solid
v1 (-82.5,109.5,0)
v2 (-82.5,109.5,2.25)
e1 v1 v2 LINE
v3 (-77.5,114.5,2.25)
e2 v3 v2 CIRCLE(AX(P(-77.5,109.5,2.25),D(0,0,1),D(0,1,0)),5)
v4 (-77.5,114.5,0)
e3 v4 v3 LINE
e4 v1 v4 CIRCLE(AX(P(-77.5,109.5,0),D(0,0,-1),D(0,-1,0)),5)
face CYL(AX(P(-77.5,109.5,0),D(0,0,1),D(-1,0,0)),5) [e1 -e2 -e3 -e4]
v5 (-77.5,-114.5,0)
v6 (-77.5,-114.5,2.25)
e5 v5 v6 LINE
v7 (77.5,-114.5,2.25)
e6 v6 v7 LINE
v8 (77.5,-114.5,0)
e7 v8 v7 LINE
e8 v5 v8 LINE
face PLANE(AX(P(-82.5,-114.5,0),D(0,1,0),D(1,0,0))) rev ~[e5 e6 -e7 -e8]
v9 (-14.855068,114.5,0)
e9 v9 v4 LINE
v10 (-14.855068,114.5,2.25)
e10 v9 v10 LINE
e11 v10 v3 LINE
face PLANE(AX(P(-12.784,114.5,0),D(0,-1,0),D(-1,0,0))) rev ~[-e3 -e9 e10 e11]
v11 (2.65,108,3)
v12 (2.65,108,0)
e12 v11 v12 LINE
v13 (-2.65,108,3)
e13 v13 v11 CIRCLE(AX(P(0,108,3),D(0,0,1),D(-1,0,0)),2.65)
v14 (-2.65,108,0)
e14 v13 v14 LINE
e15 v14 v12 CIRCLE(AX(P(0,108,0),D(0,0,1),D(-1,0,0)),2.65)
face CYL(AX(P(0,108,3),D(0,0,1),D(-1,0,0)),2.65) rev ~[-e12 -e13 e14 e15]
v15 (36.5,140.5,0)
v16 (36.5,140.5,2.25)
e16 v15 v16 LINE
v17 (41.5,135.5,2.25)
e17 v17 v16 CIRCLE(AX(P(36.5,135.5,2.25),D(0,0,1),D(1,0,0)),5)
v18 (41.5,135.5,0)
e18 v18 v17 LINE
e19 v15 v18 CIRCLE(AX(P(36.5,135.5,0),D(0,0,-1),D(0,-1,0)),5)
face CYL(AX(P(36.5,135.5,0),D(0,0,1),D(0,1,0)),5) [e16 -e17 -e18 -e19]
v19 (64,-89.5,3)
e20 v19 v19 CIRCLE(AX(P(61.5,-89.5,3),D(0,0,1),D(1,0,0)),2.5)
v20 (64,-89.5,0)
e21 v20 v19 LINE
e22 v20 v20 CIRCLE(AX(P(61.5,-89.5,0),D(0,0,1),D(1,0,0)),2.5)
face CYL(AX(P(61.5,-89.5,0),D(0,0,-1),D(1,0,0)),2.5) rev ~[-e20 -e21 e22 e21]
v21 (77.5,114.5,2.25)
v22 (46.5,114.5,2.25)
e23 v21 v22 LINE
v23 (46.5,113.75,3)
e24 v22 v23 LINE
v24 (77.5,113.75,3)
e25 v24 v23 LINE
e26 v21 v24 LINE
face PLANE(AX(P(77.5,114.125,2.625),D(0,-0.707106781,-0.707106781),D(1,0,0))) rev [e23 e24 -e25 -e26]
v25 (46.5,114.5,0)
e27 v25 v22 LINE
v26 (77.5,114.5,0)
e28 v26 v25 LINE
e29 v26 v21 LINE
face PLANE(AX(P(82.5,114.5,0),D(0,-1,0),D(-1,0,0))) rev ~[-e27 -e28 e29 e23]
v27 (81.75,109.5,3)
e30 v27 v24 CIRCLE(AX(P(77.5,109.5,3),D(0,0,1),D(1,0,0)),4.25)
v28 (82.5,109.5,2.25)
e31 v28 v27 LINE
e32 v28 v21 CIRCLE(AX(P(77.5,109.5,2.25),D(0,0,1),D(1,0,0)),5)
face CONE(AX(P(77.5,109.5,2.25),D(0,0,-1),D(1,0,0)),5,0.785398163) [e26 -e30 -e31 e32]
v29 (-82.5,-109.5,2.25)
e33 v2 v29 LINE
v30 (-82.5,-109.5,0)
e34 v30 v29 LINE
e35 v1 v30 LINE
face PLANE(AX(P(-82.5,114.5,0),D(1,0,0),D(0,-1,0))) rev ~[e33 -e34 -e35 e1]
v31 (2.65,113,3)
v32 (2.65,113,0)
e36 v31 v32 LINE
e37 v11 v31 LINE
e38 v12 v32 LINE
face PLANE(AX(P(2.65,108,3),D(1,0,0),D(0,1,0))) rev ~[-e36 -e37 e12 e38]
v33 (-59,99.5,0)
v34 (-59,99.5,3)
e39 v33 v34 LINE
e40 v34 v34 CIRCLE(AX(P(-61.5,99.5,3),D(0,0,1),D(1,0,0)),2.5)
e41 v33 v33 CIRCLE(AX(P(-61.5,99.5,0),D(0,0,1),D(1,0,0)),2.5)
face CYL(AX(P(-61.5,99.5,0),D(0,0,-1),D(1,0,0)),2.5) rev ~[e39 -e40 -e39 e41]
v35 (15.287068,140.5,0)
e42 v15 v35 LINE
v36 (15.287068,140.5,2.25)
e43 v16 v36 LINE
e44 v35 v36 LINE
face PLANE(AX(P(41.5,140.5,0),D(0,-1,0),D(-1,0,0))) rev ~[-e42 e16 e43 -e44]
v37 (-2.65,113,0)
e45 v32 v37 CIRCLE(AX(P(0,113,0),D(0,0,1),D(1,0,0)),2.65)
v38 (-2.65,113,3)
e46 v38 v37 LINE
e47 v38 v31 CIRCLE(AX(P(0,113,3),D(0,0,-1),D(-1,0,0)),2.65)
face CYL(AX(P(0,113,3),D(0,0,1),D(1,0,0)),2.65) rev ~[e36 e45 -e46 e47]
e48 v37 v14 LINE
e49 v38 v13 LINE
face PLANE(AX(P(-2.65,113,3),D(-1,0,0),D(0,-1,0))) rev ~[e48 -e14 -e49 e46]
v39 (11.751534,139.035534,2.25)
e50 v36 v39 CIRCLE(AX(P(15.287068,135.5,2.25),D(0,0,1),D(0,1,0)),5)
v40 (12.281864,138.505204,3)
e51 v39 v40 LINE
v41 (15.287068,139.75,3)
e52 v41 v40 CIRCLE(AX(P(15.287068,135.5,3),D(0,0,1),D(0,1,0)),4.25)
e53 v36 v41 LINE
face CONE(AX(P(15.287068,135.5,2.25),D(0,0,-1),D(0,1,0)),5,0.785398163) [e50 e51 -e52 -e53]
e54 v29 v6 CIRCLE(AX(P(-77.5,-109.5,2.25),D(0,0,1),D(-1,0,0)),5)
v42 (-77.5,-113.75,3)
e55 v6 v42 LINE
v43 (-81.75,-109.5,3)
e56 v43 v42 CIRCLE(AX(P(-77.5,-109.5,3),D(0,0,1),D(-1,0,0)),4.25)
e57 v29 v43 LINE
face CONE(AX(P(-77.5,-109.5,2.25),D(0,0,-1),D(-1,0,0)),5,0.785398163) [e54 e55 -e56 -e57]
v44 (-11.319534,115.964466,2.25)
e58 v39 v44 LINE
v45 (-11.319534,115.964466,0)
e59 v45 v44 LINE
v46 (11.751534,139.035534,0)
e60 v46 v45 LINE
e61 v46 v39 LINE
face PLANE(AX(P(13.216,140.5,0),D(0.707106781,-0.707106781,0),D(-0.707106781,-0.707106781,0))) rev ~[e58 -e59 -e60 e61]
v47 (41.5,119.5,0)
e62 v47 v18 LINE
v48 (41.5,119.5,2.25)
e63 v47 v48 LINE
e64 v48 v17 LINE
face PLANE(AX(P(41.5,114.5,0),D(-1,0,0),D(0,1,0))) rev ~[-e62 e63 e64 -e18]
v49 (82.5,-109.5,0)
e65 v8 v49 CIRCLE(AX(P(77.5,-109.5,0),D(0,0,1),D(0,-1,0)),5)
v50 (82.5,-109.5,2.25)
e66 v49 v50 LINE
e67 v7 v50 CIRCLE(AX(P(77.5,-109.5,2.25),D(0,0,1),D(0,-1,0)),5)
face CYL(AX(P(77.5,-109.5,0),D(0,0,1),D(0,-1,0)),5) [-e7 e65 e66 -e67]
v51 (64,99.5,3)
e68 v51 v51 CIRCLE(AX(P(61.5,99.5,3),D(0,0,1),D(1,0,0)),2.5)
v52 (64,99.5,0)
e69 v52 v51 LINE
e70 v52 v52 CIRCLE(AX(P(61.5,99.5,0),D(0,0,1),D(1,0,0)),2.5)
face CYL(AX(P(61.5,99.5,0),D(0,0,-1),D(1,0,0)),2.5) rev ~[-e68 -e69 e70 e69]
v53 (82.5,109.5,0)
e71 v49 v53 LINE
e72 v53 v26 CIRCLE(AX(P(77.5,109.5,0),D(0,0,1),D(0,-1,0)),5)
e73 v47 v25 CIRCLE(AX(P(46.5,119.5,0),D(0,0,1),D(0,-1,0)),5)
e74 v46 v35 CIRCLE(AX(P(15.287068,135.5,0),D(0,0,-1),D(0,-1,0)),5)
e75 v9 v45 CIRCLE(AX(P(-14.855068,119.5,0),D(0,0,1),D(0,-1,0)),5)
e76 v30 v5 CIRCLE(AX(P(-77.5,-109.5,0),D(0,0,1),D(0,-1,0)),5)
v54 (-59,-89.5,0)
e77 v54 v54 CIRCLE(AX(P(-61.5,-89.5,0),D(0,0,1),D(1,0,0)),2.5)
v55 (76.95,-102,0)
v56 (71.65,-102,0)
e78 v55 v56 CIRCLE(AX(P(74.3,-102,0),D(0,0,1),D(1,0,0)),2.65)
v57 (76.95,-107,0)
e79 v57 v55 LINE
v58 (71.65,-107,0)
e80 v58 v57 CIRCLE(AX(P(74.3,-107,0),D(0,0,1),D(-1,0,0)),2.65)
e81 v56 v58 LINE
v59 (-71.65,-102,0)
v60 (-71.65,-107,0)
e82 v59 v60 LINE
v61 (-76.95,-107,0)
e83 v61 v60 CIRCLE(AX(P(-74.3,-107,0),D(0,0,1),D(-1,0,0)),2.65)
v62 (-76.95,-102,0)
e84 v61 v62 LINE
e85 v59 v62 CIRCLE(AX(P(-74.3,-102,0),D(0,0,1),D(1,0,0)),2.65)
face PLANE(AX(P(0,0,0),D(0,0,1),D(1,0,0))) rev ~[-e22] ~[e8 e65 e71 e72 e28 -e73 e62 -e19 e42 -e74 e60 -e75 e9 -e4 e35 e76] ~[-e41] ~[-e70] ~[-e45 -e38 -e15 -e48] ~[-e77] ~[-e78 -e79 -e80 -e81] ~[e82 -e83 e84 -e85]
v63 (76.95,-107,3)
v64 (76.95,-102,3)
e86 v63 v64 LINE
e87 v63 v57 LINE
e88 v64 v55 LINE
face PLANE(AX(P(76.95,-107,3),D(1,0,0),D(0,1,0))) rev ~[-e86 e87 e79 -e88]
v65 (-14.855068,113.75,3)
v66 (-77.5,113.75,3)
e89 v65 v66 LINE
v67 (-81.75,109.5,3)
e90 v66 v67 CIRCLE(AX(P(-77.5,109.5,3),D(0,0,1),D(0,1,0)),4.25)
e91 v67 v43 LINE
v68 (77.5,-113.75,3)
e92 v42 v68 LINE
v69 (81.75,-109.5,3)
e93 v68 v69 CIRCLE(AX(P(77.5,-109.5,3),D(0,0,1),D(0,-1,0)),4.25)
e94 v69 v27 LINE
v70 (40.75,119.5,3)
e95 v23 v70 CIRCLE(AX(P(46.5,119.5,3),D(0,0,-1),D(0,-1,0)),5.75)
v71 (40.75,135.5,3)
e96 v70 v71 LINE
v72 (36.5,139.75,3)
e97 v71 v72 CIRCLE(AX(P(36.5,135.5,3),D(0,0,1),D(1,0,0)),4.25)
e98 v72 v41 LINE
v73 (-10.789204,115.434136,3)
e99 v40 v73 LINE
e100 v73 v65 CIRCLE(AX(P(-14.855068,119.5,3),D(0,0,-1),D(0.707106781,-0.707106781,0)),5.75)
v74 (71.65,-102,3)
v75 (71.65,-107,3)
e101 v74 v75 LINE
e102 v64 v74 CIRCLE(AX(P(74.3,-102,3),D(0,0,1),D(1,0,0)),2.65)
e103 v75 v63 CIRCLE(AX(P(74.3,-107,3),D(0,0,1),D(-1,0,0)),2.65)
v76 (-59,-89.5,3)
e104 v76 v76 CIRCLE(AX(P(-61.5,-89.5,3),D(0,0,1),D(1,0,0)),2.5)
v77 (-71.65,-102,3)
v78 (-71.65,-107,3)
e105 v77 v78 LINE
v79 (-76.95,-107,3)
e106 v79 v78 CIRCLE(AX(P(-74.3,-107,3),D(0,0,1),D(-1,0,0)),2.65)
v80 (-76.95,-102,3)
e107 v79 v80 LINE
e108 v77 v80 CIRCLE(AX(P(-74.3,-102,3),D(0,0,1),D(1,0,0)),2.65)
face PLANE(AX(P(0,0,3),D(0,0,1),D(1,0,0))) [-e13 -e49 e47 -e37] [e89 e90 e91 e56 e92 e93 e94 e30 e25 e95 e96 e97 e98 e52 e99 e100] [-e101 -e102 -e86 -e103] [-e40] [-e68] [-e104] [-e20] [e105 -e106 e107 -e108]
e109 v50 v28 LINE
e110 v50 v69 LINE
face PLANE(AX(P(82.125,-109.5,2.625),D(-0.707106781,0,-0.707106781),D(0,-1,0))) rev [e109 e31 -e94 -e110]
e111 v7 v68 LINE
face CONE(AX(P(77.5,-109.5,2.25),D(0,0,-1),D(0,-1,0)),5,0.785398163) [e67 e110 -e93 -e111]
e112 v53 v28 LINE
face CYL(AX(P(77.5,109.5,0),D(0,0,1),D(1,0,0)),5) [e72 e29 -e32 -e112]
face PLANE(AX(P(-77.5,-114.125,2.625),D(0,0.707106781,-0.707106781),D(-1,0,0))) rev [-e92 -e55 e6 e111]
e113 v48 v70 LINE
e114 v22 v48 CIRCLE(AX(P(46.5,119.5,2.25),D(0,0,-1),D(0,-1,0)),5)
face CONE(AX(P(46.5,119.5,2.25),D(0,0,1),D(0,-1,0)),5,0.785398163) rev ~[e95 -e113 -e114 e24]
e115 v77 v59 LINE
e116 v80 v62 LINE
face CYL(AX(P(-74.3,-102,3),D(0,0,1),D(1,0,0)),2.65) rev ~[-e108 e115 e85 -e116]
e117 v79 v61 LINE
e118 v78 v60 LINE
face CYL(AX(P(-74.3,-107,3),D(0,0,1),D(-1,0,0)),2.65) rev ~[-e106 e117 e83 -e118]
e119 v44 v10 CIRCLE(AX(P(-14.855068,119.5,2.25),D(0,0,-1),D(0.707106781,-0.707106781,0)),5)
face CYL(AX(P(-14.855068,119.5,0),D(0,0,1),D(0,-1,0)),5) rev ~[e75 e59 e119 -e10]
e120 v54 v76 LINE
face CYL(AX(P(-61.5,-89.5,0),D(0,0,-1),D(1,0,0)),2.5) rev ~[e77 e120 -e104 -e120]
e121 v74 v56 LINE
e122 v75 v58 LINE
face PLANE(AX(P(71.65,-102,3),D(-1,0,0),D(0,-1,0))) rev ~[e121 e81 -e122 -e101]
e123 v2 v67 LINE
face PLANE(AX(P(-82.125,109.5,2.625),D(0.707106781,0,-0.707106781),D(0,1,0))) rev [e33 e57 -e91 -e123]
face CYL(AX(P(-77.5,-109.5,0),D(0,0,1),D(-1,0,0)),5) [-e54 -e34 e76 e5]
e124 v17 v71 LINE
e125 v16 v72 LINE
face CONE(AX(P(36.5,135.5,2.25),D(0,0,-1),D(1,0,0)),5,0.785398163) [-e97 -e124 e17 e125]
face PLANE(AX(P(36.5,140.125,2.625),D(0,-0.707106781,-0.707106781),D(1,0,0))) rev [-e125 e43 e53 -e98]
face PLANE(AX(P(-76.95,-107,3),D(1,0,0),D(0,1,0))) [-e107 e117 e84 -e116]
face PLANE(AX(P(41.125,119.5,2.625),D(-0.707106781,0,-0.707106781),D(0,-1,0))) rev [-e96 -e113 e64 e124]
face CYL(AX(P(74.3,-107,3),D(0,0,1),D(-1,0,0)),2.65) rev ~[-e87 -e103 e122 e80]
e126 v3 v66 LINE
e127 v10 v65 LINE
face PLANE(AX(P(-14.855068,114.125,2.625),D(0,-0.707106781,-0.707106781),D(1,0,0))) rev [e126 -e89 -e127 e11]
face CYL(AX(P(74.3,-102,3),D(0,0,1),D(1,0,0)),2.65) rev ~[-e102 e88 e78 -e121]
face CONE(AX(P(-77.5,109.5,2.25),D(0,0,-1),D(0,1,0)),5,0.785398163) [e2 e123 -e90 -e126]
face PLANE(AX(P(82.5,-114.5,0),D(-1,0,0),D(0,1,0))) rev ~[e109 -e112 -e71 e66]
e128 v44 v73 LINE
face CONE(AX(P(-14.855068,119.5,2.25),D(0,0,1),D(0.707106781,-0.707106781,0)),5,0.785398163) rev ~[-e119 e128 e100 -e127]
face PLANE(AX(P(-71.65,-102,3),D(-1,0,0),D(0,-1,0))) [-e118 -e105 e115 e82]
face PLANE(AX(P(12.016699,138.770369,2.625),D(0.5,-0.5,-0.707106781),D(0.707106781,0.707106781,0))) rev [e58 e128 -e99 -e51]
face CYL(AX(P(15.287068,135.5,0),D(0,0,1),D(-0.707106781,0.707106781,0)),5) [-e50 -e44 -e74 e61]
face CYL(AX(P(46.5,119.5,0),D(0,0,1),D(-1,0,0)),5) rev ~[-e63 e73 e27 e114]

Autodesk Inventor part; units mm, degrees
ref_plane "YZ Plane" through (0, 0, 0) normal (1, 0, 0) x (0, 1, 0)
ref_plane "XZ Plane" through (0, 0, 0) normal (0, 1, 0) x (-1, 0, 0)
ref_plane "XY Plane" through (0, 0, 0) normal (0, 0, 1) x (1, 0, 0)
sketch "Sketch1" plane through (0, 0, 0) normal (0, 0, 1) x (1, 0, 0)
  line L0 (-82.5, -114.5) -> (82.5, -114.5)
  line L1 (82.5, -114.5) -> (82.5, 114.5)
  line L2 (82.5, 114.5) -> (-82.5, 114.5)
  line L3 (-82.5, 114.5) -> (-82.5, -114.5)
  line L4 (-82.5, -114.5) -> (82.5, 114.5) construction
  line L5 (82.5, -114.5) -> (-82.5, 114.5) construction
  circle A0 centre (61.5, 99.5) radius 2.5
  line L6 (-147.2223, 0) -> (154.3177, 0) construction
  line L7 (-104.1452, 5) -> (111.2405, 5) construction
  circle A1 centre (61.5, -89.5) radius 2.5
  line L8 (0, 191.5) -> (0, -165.5) construction
  circle A2 centre (-61.5, 99.5) radius 2.5
  circle A3 centre (-61.5, -89.5) radius 2.5
  line L9 (41.5, 114.5) -> (41.5, 140.5)
  line L10 (41.5, 140.5) -> (13.216, 140.5)
  line L11 (13.216, 140.5) -> (-12.784, 114.5)
  point P0 (0, 0)
  dimension "d0" = 229
  dimension "d1" = 165
  dimension "d3" = 5
  dimension "d5" = 189
  dimension "d6" = 25
  dimension "d9" = 61.5
  dimension "d31" = 41
  dimension "d32" = 26
  dimension "d33" = 135
  dimension "d34" = 28.284
extrude "Plate1" add sketch "Sketch1" along normal blind 3
fillet "Fillet1" radius 5 4 edges at (-82.5, 114.5, 1.5) (82.5, 114.5, 1.5) (82.5, -114.5, 1.5) (-82.5, -114.5, 1.5)
sketch "Sketch2" plane through (0, 0, 3) normal (0, 0, 1) x (1, 0, 0)
  line L0 (-74.3, -107) -> (-74.3, -102) construction
  line L1 (-76.95, -107) -> (-76.95, -102)
  line L2 (-71.65, -102) -> (-71.65, -107)
  arc A0 (-76.95, -107) -> (-71.65, -107) centre (-74.3, -107) ccw
  arc A1 (-71.65, -102) -> (-76.95, -102) centre (-74.3, -102) ccw
  line L3 (-103.0799, -19.5) -> (98.9164, -19.5) construction
  line L4 (0, 191.5) -> (0, -165.5) construction
  line L5 (-82.5, -109.5) -> (-82.5, 109.5) construction
  line L6 (74.3, -107) -> (74.3, -102) construction
  line L7 (76.95, -107) -> (76.95, -102)
  line L8 (71.65, -102) -> (71.65, -107)
  arc A2 (71.65, -107) -> (76.95, -107) centre (74.3, -107) ccw
  arc A3 (76.95, -102) -> (71.65, -102) centre (74.3, -102) ccw
  line L9 (77.5, -114.5) -> (-77.5, -114.5) projected
  line L10 (0, 113) -> (0, 108) construction
  line L11 (-2.65, 113) -> (-2.65, 108)
  line L12 (2.65, 108) -> (2.65, 113)
  arc A4 (2.65, 113) -> (-2.65, 113) centre (0, 113) ccw
  arc A5 (-2.65, 108) -> (2.65, 108) centre (0, 108) ccw
  line L13 (-77.5, 114.5) -> (77.5, 114.5) projected
  point P0 (0, 0)
  point P1 (-74.3, -104.5)
  point P2 (74.3, -104.5)
  point P3 (82.5, -109.5)
  point P4 (0, 110.5)
  dimension "d12" = 85
  dimension "d14" = 5
  dimension "d15" = 2.65
  dimension "d18" = 10
  dimension "d22" = 148.6
  dimension "d23" = 5
  dimension "d24" = 2.65
  dimension "d26" = 225
extrude "Cut1" cut sketch "Sketch2" against normal blind 3
fillet "Fillet2" radius 5 4 edges at (41.5, 114.5, 1.5) (41.5, 140.5, 1.5) (13.216, 140.5, 1.5) (-12.784, 114.5, 1.5)
chamfer "Chamfer1" distance 0.75 angle 45 14 edges at (0, -114.5, 3) (-81.0355, -113.0355, 3) (-82.5, 0, 3) (-81.0355, 113.0355, 3) (-46.1775, 114.5, 3) (13.3737, 140.1194, 3) (40.0355, 139.0355, 3) (0.216, 127.5, 3) (25.8935, 140.5, 3) (41.5, 127.5, 3) (62, 114.5, 3) (81.0355, 113.0355, 3) (82.5, 0, 3) (81.0355, -113.0355, 3)
sketch "Sketch4" plane through (0, 0, 3) normal (0, 0, 1) x (1, 0, 0)
  circle A0 centre (85, -108.7631) radius 2
  line L0 (82.5, -109.5) -> (82.5, 109.5) projected
  point P0 (0, 0)
  dimension "d35" = 2.5
  dimension "d36" = 4
equation "\"d18\" = d13"
equation "\"d3\" = d2"
equation "\"d15\" = d24"
equation "\"d23\" = d14"
equation "\"d16\" = Thickness"
equation "\"d10\" = Thickness"
equation "\"BendRadius\" = Thickness"
equation "\"BendReliefWidth\" = Thickness"
equation "\"BendReliefDepth\" = 0.5 * Thickness"
equation "\"CornerReliefSize\" = 4 * Thickness"
equation "\"MinimumRemnant\" = 2 * Thickness"
equation "\"TransitionRadius\" = BendRadius"
equation "\"JacobiRadiusSize\" = BendRadius"
equation "\"GapSize\" = Thickness"
equation "\"d2\" = 5"
equation "\"Thickness\" = 3"
equation "\"d13\" = 10"
properties part number "TBD_Box_Fix"
